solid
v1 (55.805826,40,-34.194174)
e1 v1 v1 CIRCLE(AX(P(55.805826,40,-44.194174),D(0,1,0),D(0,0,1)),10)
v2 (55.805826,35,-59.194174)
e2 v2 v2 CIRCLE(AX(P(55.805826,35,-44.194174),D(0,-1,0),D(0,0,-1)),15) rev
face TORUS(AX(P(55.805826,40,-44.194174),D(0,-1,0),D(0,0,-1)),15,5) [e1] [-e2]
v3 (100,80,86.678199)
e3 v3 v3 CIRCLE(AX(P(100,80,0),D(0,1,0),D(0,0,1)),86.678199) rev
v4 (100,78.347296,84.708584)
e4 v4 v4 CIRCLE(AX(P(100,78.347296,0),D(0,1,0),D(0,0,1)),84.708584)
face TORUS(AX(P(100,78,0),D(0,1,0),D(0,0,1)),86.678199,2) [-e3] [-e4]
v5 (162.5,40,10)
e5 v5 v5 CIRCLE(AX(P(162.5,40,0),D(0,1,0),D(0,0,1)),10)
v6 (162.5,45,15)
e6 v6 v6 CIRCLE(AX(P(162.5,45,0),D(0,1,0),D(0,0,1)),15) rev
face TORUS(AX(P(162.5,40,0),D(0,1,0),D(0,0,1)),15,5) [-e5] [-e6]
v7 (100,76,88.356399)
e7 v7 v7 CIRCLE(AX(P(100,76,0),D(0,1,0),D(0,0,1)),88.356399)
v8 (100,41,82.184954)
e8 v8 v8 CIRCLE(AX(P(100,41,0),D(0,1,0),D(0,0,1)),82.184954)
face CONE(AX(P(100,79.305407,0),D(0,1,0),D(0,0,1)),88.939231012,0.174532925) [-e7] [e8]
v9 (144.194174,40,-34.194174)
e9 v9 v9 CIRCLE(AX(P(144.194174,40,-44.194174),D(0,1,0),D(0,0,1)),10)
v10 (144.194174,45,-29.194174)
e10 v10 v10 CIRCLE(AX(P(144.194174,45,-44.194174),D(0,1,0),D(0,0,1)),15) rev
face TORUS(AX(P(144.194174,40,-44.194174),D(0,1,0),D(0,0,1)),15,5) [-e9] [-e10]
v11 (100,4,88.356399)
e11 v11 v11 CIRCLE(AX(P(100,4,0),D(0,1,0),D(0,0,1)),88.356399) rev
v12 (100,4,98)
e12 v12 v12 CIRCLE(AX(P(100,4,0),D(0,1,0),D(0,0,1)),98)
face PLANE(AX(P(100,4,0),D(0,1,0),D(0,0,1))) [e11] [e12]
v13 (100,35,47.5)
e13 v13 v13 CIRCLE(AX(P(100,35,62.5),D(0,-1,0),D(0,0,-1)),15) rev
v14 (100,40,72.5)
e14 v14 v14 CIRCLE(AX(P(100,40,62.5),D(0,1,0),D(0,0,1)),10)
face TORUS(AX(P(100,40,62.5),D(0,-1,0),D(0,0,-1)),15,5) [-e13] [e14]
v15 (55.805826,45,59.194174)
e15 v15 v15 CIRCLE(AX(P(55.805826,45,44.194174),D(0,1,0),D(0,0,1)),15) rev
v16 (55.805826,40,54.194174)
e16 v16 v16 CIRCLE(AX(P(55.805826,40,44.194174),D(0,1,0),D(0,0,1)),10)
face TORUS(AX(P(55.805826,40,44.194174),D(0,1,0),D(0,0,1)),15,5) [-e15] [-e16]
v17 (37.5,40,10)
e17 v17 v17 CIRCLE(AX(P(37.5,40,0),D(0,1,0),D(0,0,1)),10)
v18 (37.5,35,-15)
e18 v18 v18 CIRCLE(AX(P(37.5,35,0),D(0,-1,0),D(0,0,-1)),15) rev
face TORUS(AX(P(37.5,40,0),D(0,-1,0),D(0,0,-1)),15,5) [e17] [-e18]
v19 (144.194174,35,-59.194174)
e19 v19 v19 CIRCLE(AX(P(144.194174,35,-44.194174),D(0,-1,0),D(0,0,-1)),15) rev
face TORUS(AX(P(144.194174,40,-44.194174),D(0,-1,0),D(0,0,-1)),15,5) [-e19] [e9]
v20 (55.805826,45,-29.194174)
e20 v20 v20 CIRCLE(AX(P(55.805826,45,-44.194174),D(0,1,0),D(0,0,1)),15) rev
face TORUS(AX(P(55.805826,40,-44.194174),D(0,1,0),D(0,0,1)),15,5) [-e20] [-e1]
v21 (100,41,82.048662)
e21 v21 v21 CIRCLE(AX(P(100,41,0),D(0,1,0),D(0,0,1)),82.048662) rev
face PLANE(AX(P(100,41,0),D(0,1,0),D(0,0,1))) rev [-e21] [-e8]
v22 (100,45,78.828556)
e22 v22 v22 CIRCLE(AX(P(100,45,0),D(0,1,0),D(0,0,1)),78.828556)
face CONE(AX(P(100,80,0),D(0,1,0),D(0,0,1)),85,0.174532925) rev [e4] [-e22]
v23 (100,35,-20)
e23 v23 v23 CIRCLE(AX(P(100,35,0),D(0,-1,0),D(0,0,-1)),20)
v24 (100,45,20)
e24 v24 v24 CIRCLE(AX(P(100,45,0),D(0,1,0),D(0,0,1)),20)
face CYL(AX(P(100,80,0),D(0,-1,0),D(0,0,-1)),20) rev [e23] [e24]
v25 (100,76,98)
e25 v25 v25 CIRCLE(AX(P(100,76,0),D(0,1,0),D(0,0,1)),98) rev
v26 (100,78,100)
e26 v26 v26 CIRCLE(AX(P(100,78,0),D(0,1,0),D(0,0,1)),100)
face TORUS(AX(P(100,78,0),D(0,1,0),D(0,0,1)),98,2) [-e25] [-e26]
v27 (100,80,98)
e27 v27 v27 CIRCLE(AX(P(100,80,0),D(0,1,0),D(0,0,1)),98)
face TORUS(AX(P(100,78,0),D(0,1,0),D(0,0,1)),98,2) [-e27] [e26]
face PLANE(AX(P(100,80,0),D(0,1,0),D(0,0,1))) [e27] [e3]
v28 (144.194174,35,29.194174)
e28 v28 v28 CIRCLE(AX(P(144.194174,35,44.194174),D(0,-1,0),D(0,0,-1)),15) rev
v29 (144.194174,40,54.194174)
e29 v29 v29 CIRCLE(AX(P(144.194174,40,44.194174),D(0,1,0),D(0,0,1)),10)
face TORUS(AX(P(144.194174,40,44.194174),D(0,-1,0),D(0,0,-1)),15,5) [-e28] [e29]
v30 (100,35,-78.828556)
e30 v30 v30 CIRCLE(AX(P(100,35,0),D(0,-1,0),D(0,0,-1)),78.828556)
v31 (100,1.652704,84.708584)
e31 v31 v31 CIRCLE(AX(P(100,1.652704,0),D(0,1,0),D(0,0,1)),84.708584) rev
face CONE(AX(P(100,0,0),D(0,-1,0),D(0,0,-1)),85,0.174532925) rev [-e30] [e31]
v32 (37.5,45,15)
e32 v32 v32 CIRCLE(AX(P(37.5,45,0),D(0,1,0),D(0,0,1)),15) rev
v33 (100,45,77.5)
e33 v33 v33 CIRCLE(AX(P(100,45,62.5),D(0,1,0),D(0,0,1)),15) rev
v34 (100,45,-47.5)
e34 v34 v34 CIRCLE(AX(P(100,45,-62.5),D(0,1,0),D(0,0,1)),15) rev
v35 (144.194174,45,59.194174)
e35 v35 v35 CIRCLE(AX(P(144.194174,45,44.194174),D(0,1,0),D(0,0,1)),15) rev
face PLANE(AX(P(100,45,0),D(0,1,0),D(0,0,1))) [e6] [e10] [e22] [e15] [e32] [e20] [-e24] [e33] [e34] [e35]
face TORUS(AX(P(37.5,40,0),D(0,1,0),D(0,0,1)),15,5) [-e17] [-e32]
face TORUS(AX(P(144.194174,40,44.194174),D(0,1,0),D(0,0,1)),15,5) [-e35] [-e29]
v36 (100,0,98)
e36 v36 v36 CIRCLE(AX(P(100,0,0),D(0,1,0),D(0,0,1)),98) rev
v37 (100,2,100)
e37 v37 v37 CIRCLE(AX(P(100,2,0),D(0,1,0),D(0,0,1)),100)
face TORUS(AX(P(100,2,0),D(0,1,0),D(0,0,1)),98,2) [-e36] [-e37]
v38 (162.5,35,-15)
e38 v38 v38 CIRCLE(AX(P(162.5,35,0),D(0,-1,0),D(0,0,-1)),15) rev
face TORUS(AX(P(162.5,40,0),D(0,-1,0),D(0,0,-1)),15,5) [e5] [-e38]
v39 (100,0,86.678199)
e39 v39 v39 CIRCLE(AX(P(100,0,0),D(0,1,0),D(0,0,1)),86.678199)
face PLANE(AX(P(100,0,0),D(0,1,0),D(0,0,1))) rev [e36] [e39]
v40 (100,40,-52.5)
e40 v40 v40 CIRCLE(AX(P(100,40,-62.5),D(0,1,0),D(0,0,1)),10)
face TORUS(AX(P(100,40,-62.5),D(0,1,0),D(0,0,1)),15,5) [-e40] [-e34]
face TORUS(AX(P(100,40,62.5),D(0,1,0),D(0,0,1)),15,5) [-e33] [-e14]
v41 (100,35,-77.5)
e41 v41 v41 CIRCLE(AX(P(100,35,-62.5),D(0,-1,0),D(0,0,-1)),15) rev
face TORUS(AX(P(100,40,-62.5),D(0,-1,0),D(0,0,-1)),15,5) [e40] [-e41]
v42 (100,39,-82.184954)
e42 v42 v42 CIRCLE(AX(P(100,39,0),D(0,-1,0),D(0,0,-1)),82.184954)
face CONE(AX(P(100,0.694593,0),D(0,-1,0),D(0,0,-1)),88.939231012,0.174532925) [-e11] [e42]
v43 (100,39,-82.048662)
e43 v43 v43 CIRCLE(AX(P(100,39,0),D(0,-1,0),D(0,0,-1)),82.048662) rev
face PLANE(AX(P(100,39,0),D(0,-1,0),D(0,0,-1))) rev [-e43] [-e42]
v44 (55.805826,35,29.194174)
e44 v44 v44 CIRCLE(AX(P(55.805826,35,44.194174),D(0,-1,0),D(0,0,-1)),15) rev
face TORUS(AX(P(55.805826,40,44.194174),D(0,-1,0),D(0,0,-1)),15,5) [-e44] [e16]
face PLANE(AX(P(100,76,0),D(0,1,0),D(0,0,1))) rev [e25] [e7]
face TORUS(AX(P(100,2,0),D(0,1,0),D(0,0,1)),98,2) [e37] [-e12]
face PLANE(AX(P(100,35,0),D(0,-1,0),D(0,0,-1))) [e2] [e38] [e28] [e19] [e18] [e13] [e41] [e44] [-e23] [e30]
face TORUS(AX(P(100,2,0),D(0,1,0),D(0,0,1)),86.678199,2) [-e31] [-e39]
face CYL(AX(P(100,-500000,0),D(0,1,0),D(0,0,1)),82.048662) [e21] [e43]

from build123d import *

# Parameters (mm, degrees)
SKETCH_1_R            = 100
SKETCH_1_R_2          = 20
SKETCH_1_R_3          = 10
EXTRUDE_3_DEPTH       = 80
SKETCH_6_R            = 85
CUT_EXTRUDE_3_DEPTH   = 35
CUT_EXTRUDE_3_DRAFT   = -10
SKETCH_7_R            = 85
CUT_EXTRUDE_4_DEPTH   = 35
CUT_EXTRUDE_4_DRAFT   = -10
SHELL_2_T             = -4
EXTRUDE_4_OUTLINE_R   = 82.048662268
EXTRUDE_4_OUTLINE_R_2 = 14
EXTRUDE_4_OUTLINE_R_3 = 24
EXTRUDE_4_DEPTH       = 2
FILLET_4_R            = 2
FILLET_5_R            = 5
FILLET_6_R            = 2


# Read off the part's stored shape, not the designer's step: 凸台-拉伸4
with BuildPart() as part:
    # 草图1 → 凸台-拉伸3 (new body)
    with BuildSketch(Plane(origin=(0, 0, 0), x_dir=(1, 0, 0), z_dir=(0, 1, 0))):
        with Locations(Location((100, 0, 0), (0, 0, 270))):
            Circle(SKETCH_1_R)
        with Locations(Location((100, 0, 0), (0, 0, 270))):
            Circle(SKETCH_1_R_2, mode=Mode.SUBTRACT)
        with Locations(Location((100, 62.5, 0), (0, 0, 270))):
            Circle(SKETCH_1_R_3, mode=Mode.SUBTRACT)
        with Locations(Location((144.194173824, 44.194173824, 0), (0, 0, 270))):
            Circle(SKETCH_1_R_3, mode=Mode.SUBTRACT)
        with Locations(Location((162.5, 0, 0), (0, 0, 270))):
            Circle(SKETCH_1_R_3, mode=Mode.SUBTRACT)
        with Locations(Location((144.194173824, -44.194173824, 0), (0, 0, 270))):
            Circle(SKETCH_1_R_3, mode=Mode.SUBTRACT)
        with Locations(Location((100, -62.5, 0), (0, 0, 270))):
            Circle(SKETCH_1_R_3, mode=Mode.SUBTRACT)
        with Locations(Location((55.805826176, -44.194173824, 0), (0, 0, 270))):
            Circle(SKETCH_1_R_3, mode=Mode.SUBTRACT)
        with Locations(Location((37.5, 0, 0), (0, 0, 270))):
            Circle(SKETCH_1_R_3, mode=Mode.SUBTRACT)
        with Locations(Location((55.805826176, 44.194173824, 0), (0, 0, 270))):
            Circle(SKETCH_1_R_3, mode=Mode.SUBTRACT)
    extrude(amount=EXTRUDE_3_DEPTH)


with BuildPart() as cut_extrude_3_tool:
    # 草图6 → 切除-拉伸3 (with draft: the straight prism first)
    with BuildSketch(Plane(origin=(0, 80, 0), x_dir=(1, 0, 0), z_dir=(0, 1, 0))):
        with Locations((100, 0)):
            Circle(SKETCH_6_R)
    extrude(amount=-CUT_EXTRUDE_3_DEPTH)
    # 切除-拉伸3: the draft: its side faces are tilted about the plane it starts from
    cut_extrude_3_sides = [cut_extrude_3_tool.faces().sort_by_distance(p)[0] for p in [
        (15, 62.5, 0),
    ]]
    draft(cut_extrude_3_sides, Plane(origin=(0, 80, 0), x_dir=(1, 0, 0), z_dir=(0, 1, 0)), CUT_EXTRUDE_3_DRAFT)


with BuildPart() as part_1:
    add(part.part)

    # 切除-拉伸3: cut by cut_extrude_3_tool
    add(cut_extrude_3_tool.part, mode=Mode.SUBTRACT)


with BuildPart() as cut_extrude_4_tool:
    # 草图7 → 切除-拉伸4 (with draft: the straight prism first)
    with BuildSketch(Plane.XZ):
        with Locations((100, 0)):
            Circle(SKETCH_7_R)
    extrude(amount=-CUT_EXTRUDE_4_DEPTH)
    # 切除-拉伸4: the draft: its side faces are tilted about the plane it starts from
    cut_extrude_4_sides = [cut_extrude_4_tool.faces().sort_by_distance(p)[0] for p in [
        (15, 17.5, 0),
    ]]
    draft(cut_extrude_4_sides, Plane.XZ, CUT_EXTRUDE_4_DRAFT)


with BuildPart() as part_2:
    add(part_1.part)

    # 切除-拉伸4: cut by cut_extrude_4_tool
    add(cut_extrude_4_tool.part, mode=Mode.SUBTRACT)

    # 抽壳2
    shell_2_openings = [part_2.faces().sort_by_distance(p)[0] for p in [
        (100, 40, -100),
    ]]
    offset(amount=SHELL_2_T, openings=shell_2_openings, kind=Kind.INTERSECTION)

    # 凸台-拉伸4 outline → 凸台-拉伸4 (add)
    with BuildSketch(Plane.XZ.offset(-41)):
        with Locations((100, 0)):
            Circle(EXTRUDE_4_OUTLINE_R)
        with Locations((55.805826176, -44.194173824)):
            Circle(EXTRUDE_4_OUTLINE_R_2, mode=Mode.SUBTRACT)
        with Locations((100, -62.5)):
            Circle(EXTRUDE_4_OUTLINE_R_2, mode=Mode.SUBTRACT)
        with Locations((144.194173824, -44.194173824)):
            Circle(EXTRUDE_4_OUTLINE_R_2, mode=Mode.SUBTRACT)
        with Locations((37.5, 0)):
            Circle(EXTRUDE_4_OUTLINE_R_2, mode=Mode.SUBTRACT)
        with Locations((55.805826176, 44.194173824)):
            Circle(EXTRUDE_4_OUTLINE_R_2, mode=Mode.SUBTRACT)
        with Locations((100, 0)):
            Circle(EXTRUDE_4_OUTLINE_R_3, mode=Mode.SUBTRACT)
        with Locations((162.5, 0)):
            Circle(EXTRUDE_4_OUTLINE_R_2, mode=Mode.SUBTRACT)
        with Locations((100, 62.5)):
            Circle(EXTRUDE_4_OUTLINE_R_2, mode=Mode.SUBTRACT)
        with Locations((144.194173824, 44.194173824)):
            Circle(EXTRUDE_4_OUTLINE_R_2, mode=Mode.SUBTRACT)
    extrude(amount=EXTRUDE_4_DEPTH)

    # 圆角4
    fillet_4_edges = [part_2.edges().sort_by_distance(p)[0] for p in [
        (100, 0, -100),
        (100, 80, -100),
        (100, 76, -100),
        (100, 4, -100),
    ]]
    fillet(fillet_4_edges, radius=FILLET_4_R - 0.0001)  # a hair under: the kernel refuses the full size

    # 圆角5
    fillet_5_edges = [part_2.edges().sort_by_distance(p)[0] for p in [
        (100, 45, -72.5),
        (144.194173824, 45, -54.194173824),
        (162.5, 45, -10),
        (144.194173824, 45, 34.194173824),
        (100, 45, 52.5),
        (55.805826176, 45, 34.194173824),
        (37.5, 45, -10),
        (55.805826176, 45, -54.194173824),
        (100, 35, -72.5),
        (144.194173824, 35, -54.194173824),
        (162.5, 35, -10),
        (144.194173824, 35, 34.194173824),
        (100, 35, 52.5),
        (55.805826176, 35, 34.194173824),
        (37.5, 35, -10),
        (55.805826176, 35, -54.194173824),
    ]]
    fillet(fillet_5_edges, radius=FILLET_5_R - 0.0001)  # a hair under: the kernel refuses the full size

    # 圆角6
    fillet_6_edges = [part_2.edges().sort_by_distance(p)[0] for p in [
        (15, 80, 0),
        (15, 0, 0),
    ]]
    fillet(fillet_6_edges, radius=FILLET_6_R)


solid = part_2.part
